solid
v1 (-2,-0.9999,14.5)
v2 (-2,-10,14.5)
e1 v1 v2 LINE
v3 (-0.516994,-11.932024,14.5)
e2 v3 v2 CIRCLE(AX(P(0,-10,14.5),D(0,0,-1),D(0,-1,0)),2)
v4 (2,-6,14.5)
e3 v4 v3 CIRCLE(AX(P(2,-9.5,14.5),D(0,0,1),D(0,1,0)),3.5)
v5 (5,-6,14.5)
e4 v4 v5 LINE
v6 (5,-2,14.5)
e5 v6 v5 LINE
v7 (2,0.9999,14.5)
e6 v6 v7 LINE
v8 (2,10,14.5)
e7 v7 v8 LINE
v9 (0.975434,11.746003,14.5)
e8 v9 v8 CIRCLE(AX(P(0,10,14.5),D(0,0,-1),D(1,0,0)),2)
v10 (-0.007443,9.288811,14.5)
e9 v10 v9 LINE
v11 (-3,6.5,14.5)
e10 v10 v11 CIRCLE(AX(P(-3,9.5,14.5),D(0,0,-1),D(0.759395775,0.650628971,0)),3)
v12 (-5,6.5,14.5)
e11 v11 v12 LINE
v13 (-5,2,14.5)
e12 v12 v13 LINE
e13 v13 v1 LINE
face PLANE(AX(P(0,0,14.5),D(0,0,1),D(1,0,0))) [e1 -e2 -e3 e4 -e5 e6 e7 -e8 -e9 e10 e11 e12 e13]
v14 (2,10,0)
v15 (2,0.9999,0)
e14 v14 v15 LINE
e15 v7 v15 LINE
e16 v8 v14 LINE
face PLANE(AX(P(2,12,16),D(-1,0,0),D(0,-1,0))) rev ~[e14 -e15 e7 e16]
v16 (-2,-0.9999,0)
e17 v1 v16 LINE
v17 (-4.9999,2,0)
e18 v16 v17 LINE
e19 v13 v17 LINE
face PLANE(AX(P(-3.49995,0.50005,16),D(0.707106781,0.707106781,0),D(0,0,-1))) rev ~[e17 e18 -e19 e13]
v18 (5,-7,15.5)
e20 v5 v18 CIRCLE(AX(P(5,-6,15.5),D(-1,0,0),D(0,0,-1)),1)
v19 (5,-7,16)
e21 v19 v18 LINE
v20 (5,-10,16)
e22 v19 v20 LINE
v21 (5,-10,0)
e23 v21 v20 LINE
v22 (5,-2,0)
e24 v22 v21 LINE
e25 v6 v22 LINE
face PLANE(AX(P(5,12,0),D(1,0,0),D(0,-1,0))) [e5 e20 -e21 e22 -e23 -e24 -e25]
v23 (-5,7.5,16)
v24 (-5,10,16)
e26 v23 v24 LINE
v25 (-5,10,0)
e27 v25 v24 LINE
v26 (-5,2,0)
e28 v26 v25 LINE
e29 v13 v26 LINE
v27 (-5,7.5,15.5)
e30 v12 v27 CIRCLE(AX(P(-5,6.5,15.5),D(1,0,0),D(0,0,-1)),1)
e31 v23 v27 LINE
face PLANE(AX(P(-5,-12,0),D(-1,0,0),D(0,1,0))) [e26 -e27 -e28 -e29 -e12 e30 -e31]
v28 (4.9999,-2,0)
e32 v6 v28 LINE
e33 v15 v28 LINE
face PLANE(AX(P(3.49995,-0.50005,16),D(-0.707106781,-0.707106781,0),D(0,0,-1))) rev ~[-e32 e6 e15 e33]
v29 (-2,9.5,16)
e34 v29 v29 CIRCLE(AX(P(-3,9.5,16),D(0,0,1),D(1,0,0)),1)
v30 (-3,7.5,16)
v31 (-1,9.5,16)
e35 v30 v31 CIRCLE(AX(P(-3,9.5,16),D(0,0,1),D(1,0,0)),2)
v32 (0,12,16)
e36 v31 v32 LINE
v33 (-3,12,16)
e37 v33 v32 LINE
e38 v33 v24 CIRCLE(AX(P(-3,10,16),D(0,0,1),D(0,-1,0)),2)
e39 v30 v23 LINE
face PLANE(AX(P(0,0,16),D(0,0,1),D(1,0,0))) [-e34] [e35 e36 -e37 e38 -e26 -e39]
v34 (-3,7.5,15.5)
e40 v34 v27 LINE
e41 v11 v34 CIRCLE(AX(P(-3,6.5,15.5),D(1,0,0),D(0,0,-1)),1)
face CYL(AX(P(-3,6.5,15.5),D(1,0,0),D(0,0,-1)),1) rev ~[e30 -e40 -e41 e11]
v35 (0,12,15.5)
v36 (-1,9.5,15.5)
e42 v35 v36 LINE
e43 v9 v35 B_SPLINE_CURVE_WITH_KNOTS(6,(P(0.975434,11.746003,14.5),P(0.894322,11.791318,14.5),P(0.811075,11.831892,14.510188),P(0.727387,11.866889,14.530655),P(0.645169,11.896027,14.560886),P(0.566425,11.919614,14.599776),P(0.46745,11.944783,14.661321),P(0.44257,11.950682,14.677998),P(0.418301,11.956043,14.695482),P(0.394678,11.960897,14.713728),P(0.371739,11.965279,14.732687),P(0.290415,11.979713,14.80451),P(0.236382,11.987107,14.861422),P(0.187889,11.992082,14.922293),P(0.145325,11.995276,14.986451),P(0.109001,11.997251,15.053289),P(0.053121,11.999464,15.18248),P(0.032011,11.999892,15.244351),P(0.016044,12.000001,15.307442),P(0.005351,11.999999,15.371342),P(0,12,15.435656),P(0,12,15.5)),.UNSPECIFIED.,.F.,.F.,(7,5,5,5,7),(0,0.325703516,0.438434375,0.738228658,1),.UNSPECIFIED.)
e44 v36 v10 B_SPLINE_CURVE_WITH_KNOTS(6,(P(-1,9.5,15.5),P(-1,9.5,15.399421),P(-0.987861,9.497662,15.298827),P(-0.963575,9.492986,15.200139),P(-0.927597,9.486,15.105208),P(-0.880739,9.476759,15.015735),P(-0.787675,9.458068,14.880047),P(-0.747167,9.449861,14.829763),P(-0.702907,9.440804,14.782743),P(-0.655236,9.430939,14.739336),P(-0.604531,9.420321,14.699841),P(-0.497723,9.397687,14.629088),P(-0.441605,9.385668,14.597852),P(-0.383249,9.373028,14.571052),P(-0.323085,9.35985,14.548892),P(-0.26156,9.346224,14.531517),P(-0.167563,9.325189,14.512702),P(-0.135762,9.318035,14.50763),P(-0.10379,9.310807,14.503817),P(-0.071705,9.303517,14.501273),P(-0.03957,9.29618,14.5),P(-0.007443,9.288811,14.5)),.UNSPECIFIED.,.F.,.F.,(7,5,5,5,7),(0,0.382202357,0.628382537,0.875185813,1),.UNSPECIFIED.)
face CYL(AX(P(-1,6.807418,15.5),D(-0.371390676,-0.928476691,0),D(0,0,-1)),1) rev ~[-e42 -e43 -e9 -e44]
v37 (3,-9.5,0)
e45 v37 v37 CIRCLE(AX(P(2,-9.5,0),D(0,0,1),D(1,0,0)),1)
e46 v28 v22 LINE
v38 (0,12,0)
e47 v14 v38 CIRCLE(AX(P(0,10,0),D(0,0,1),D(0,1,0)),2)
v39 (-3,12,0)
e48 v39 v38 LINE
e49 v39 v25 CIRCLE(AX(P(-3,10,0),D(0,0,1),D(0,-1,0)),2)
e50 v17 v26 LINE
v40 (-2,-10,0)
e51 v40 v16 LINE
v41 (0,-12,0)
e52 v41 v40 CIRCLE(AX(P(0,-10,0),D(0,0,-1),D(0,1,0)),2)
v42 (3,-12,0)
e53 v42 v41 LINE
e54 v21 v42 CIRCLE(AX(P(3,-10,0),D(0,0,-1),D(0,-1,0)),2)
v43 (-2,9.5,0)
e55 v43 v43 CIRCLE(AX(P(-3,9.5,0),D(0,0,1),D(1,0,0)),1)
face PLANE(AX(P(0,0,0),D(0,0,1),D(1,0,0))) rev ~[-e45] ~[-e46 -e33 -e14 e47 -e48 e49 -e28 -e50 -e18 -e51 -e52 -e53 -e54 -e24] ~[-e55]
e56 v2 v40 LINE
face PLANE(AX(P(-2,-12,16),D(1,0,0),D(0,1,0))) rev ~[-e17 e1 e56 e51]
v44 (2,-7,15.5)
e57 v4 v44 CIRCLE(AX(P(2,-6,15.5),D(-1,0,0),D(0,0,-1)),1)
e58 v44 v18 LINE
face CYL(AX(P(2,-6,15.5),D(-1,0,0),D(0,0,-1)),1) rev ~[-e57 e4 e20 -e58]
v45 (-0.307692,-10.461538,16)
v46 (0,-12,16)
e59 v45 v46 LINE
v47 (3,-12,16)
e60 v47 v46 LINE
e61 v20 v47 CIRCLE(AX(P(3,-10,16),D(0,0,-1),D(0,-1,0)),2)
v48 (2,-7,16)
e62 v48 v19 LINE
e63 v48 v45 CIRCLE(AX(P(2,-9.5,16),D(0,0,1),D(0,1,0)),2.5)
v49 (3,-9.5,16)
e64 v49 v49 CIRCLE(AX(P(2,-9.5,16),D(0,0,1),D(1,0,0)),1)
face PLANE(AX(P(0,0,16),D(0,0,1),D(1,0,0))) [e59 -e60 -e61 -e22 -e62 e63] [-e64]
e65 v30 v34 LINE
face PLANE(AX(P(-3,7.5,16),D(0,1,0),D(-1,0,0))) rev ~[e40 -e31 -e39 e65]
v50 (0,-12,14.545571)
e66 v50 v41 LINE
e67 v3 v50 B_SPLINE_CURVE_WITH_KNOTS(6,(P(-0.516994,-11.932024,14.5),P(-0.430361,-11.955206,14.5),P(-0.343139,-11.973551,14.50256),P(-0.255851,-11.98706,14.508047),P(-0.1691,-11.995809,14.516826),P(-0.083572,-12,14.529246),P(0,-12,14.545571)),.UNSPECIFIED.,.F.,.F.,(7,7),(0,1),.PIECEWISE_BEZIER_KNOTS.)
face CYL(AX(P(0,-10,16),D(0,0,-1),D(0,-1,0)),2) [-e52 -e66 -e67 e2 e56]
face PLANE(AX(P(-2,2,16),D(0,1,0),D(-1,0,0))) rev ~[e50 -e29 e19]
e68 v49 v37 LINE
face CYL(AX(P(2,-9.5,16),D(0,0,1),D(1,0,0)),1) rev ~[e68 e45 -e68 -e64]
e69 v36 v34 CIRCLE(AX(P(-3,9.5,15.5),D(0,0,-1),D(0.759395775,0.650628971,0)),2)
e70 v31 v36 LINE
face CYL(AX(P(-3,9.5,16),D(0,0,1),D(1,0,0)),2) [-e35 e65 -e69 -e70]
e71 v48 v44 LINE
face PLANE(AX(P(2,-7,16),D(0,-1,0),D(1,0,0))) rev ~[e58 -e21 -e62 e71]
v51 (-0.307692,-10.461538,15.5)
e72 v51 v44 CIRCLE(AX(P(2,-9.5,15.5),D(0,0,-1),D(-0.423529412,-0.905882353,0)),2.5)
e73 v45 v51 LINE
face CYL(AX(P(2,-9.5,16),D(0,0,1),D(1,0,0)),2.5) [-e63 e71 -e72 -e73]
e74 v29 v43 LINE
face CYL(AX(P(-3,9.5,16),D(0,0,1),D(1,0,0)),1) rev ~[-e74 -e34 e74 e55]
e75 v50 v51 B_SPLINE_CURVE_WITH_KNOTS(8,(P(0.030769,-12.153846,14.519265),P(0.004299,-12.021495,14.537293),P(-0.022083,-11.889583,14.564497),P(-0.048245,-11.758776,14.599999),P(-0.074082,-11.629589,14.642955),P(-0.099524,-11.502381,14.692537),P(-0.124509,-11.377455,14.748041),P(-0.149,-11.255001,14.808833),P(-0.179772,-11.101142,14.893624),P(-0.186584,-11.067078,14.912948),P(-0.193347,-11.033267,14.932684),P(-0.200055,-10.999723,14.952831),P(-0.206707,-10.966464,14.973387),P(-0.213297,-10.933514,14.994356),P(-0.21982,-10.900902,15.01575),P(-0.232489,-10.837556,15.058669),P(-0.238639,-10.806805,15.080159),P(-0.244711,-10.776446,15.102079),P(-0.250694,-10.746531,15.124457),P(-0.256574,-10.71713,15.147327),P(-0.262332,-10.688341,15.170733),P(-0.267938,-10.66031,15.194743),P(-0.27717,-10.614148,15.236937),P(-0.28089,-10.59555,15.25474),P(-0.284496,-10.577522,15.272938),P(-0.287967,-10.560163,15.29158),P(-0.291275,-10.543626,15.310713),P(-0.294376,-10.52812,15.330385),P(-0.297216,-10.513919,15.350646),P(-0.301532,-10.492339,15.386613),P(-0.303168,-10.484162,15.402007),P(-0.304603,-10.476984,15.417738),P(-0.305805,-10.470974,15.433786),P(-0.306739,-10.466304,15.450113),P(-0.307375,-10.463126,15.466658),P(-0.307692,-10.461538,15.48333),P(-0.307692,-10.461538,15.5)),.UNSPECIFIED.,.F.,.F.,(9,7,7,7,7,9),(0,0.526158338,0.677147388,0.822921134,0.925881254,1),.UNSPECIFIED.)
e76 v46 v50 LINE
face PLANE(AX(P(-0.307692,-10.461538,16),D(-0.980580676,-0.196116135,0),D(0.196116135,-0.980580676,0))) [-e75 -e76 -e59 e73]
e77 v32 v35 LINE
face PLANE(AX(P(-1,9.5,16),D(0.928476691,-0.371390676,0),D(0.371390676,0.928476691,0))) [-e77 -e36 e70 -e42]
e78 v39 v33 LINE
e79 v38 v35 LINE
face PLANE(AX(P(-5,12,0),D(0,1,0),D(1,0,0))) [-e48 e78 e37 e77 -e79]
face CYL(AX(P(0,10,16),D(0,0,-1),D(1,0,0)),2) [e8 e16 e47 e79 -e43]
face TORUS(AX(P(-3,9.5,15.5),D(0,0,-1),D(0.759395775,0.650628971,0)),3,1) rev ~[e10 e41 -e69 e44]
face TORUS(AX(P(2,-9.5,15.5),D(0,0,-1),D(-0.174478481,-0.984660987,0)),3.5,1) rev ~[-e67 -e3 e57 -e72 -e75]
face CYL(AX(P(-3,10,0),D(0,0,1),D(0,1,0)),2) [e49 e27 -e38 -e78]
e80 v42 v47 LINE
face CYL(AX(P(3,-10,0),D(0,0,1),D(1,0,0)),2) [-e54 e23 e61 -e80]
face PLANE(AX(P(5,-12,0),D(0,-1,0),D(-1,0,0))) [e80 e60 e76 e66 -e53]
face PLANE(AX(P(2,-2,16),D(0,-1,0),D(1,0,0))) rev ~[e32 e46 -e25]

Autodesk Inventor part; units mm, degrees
ref_plane "YZ Plane" through (0, 0, 0) normal (1, 0, 0) x (0, 1, 0)
ref_plane "XZ Plane" through (0, 0, 0) normal (0, 1, 0) x (-1, 0, 0)
ref_plane "XY Plane" through (0, 0, 0) normal (0, 0, 1) x (1, 0, 0)
sketch "Sketch1" plane through (0, 0, 0) normal (0, 0, 1) x (1, 0, 0)
  line L0 (-5, 12) -> (5, 12)
  line L1 (5, 12) -> (5, -12)
  line L2 (5, -12) -> (-5, -12)
  line L3 (-5, -12) -> (-5, 12)
  point P0 (0, 0)
  dimension "d0" = 10
  dimension "d1" = 24
  dimension "d2" = 12
  dimension "d3" = 5
extrude "Extrusion1" add sketch "Sketch1" along normal blind 16
sketch "Sketch2" plane through (0, 0, 16) normal (0, 0, 1) x (1, 0, 0)
  line L0 (-5, -12) -> (5, -12) projected
  line L1 (5, -12) -> (5, 12) projected
  circle A0 centre (2, -9.5) radius 1
  point P0 (0, 0)
  point P1 (-2.9408, 9.031)
  dimension "d6" = 2.5
  dimension "d7" = 3
  dimension "d8" = 2
extrude "Extrusion2" cut sketch "Sketch2" against normal blind 16
sketch "Sketch3" plane through (0, 0, 16) normal (0, 0, 1) x (1, 0, 0)
  circle A0 centre (2, -9.5) radius 1 projected
  circle A1 centre (-3, 9.5) radius 1
  point P0 (0, 0)
  point P1 (23.854, -2.3999)
  dimension "d11" = 5
  dimension "d12" = 19
  dimension "d13" = 2
extrude "Extrusion3" cut sketch "Sketch3" against normal blind 16 contours A1
sketch "Sketch4" plane through (0, 0, 16) normal (0, 0, 1) x (1, 0, 0)
  line L0 (-5, 12) -> (-5, -12) projected
  line L1 (-5, -12) -> (-2, -12)
  line L2 (-2, -12) -> (-2, 2)
  line L3 (-2, 2) -> (-5, 2)
  line L4 (-5, 2) -> (-5, -12)
  line L5 (5, -12) -> (5, 12) projected
  line L6 (5, 12) -> (2, 12)
  line L7 (2, 12) -> (2, -2)
  line L8 (2, -2) -> (5, -2)
  line L9 (5, -2) -> (5, 12)
  point P0 (0, 0)
  dimension "d16" = 3
  dimension "d17" = 3
  dimension "d18" = 14
  dimension "d19" = 14
extrude "Extrusion4" cut sketch "Sketch4" against normal blind 16
chamfer "Chamfer1" distance 3 angle 45 2 edges at (-2, 2, 8) (2, -2, 8)
fillet "Fillet1" radius 2 4 edges at (-5, 12, 8) (2, 12, 8) (5, -12, 8) (-2, -12, 8)
sketch "Sketch5" plane through (0, 0, 16) normal (0, 0, 1) x (1, 0, 0)
  circle A0 centre (-3, 9.5) radius 1 projected
  circle A1 centre (-3, 9.5) radius 2
  line L0 (-5, 10) -> (-5, 2) projected
  circle A2 centre (2, -9.5) radius 1 projected
  circle A3 centre (2, -9.5) radius 2.5
  line L1 (0, -12) -> (3, -12) projected
  line L2 (-5, 12) -> (5, 12)
  line L3 (5, 12) -> (5, -12)
  line L4 (5, -12) -> (-5, -12)
  line L5 (-5, -12) -> (-5, 12)
  line L6 (0, 12) -> (-3, 12) projected
  line L7 (5, -10) -> (5, -2) projected
  line L8 (-2, -1) -> (-2, -10) projected
  line L9 (2, -7) -> (5, -7)
  line L10 (-3, 7.5) -> (-5, 7.5)
  arc A4 (2, 10) -> (0, 12) centre (0, 10) ccw projected
  line L11 (-1, 9.5) -> (0, 12)
  line L12 (0, 12) -> (-5, 12)
  line L13 (-0.5, -9.5) -> (0, -12)
  point P0 (0, 0)
  point P1 (-0.3077, -10.4615)
extrude "Extrusion5" cut sketch "Sketch5" against normal blind 1.5 contours A1 L11 L2 L3 L9 A3 L13 L4 L5 L0 L10
fillet "Fillet2" radius 1 5 edges at (-0.5, 10.75, 14.5) (-4, 7.5, 14.5) (-1.5858, 8.0858, 14.5) (-0.0801, -8.1132, 14.5) (3.5, -7, 14.5)
properties part number "bridge_structure_C"
